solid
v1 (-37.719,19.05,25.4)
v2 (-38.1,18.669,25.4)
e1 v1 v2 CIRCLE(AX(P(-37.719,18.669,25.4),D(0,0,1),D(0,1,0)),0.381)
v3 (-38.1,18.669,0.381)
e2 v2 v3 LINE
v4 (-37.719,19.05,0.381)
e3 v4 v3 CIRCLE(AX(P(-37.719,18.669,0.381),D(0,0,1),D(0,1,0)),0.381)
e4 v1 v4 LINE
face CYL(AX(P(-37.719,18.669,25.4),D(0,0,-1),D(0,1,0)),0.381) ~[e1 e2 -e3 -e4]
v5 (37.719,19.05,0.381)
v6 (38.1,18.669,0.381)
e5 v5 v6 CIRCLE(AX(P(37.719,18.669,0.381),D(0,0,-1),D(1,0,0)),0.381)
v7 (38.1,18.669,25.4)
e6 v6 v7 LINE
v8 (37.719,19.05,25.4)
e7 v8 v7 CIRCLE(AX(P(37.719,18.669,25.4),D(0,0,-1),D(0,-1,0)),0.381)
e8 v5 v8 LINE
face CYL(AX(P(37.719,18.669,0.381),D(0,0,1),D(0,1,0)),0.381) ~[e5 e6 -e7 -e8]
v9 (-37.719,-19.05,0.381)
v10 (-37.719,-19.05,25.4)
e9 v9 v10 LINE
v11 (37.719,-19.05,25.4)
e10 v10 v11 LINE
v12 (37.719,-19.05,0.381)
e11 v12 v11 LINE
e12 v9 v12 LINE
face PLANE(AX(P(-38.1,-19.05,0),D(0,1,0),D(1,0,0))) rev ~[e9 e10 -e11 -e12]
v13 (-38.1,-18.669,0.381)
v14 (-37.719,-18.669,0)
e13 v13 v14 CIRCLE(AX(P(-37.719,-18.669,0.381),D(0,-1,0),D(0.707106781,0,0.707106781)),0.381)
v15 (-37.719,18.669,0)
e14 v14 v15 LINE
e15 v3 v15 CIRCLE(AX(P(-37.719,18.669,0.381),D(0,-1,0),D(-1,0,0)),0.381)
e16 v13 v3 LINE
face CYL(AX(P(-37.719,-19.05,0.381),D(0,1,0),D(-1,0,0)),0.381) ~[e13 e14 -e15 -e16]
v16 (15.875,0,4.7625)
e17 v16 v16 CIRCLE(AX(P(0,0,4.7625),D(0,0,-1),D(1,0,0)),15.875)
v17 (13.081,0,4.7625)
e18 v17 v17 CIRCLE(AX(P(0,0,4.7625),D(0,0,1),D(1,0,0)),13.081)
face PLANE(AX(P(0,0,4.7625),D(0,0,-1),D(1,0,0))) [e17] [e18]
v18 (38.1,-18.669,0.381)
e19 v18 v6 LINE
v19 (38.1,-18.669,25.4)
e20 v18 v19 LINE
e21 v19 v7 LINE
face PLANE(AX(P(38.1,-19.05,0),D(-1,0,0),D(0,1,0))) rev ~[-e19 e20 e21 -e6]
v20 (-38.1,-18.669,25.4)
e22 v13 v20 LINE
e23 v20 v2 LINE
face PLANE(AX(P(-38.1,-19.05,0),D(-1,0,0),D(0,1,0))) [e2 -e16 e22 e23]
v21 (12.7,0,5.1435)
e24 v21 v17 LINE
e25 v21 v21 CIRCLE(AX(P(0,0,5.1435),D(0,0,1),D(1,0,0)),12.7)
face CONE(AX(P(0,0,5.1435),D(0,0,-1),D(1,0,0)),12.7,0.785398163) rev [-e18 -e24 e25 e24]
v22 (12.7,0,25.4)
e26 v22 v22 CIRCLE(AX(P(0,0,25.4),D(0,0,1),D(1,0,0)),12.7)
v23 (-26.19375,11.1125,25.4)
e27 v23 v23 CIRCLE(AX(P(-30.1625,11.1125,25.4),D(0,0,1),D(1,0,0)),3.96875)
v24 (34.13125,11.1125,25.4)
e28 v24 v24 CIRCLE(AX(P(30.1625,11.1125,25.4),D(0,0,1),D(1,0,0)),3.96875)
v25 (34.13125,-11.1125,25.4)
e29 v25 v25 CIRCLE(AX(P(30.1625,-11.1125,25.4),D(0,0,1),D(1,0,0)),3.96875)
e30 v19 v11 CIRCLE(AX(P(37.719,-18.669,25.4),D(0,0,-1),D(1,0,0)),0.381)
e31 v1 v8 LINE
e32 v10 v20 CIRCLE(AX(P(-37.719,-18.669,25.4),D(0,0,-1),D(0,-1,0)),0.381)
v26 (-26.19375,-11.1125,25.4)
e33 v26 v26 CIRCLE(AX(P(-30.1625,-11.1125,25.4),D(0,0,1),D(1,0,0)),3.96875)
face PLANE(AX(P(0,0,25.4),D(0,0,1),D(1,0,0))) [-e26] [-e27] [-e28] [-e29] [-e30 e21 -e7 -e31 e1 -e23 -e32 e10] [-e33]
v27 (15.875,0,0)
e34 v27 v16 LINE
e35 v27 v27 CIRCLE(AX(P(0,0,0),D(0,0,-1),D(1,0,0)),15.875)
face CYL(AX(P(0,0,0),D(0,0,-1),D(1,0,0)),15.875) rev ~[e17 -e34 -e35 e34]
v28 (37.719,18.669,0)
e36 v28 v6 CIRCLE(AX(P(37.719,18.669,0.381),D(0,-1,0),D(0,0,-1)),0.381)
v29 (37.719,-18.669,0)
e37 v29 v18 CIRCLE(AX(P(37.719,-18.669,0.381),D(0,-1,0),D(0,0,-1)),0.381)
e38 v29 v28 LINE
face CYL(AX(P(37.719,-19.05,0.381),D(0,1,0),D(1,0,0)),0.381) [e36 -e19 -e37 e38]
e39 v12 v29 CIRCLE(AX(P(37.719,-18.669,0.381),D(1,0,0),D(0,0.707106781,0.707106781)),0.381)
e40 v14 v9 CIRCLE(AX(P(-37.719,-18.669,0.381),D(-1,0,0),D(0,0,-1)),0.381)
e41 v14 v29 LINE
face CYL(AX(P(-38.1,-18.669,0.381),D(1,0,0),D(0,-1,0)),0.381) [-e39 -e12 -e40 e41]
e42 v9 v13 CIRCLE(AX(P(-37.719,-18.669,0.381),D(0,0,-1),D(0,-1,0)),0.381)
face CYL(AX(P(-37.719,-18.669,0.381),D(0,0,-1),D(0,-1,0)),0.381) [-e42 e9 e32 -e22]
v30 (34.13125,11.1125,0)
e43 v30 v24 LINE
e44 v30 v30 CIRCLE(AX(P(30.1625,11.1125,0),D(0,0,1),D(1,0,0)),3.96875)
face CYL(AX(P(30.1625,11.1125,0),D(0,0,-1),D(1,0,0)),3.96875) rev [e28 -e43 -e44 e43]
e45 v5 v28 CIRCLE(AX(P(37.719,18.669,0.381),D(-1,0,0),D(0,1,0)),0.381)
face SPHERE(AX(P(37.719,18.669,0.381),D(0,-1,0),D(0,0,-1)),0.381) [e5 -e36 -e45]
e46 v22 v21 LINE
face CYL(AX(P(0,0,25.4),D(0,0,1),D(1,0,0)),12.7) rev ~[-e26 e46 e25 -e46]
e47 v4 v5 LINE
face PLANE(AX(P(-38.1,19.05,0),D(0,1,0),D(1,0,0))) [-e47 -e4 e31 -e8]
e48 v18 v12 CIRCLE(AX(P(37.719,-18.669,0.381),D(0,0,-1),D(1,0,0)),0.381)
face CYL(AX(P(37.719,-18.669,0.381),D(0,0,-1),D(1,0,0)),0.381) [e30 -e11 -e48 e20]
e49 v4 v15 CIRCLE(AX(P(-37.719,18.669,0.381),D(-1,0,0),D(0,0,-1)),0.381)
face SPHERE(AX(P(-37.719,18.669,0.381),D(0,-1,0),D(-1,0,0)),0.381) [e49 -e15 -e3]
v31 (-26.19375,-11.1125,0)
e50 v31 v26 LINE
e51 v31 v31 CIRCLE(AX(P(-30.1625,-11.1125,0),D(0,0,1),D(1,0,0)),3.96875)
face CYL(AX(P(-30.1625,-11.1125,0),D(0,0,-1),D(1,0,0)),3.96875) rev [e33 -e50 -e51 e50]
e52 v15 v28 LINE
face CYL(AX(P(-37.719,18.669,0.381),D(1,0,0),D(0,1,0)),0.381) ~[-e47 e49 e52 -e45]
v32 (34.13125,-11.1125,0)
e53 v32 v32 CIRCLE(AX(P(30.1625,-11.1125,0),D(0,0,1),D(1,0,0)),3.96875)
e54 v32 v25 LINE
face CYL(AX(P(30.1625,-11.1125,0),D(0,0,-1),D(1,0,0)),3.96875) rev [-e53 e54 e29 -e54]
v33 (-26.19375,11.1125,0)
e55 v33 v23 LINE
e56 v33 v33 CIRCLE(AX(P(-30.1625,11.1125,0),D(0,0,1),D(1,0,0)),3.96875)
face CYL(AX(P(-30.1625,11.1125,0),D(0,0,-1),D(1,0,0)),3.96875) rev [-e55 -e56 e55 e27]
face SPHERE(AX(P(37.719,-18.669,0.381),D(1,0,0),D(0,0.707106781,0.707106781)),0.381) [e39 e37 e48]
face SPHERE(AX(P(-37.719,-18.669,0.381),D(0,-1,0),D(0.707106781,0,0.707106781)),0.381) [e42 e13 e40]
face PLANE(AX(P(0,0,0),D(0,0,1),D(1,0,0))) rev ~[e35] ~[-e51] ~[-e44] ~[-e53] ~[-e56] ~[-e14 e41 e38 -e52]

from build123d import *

# Parameters (mm, degrees)
F0_W         = 76.2
F0_H         = 38.1
F0_R         = 3.96875
F1_DEPTH     = 25.4
F2_R         = 0.381
F3_R         = 0.381
F4_T1_DEPTH  = 25.9715
F4_S5_W      = 0.381
F4_S5_H      = 0.381
F4_T6_DEPTH  = 0.381
F4_S11_W     = 0.381
F4_S11_H     = 0.381
F4_T12_DEPTH = 0.381
F5_R         = 12.7
F6_DEPTH     = 25.4
F7_R         = 15.875
F8_DEPTH     = 4.7625
F9_SIZE      = 0.381


# Not quite as in the source:
# - a fillet or chamfer that OpenCascade refuses, or shapes differently, is made with other operations: its cross-section is extruded or revolved along the edge and cut away or added


with BuildPart() as f1:
    # F0 (on Top) → F1 (new body)
    with BuildSketch(Plane.XY):
        Rectangle(F0_W, F0_H)
        with Locations((-30.1625, -11.1125)):
            Circle(F0_R, mode=Mode.SUBTRACT)
        with Locations((30.1625, -11.1125)):
            Circle(F0_R, mode=Mode.SUBTRACT)
        with Locations((-30.1625, 11.1125)):
            Circle(F0_R, mode=Mode.SUBTRACT)
        with Locations((30.1625, 11.1125)):
            Circle(F0_R, mode=Mode.SUBTRACT)
    extrude(amount=F1_DEPTH)

    # F2
    f2_edges = [f1.edges().sort_by_distance(p)[0] for p in [
        (0, -19.05, 0),
        (38.1, 0, 0),
        (-38.1, 0, 0),
    ]]
    fillet(f2_edges, radius=F2_R)

    # F3
    f3_edges = [f1.edges().sort_by_distance(p)[0] for p in [
        (0, 19.05, 0),
    ]]
    fillet(f3_edges, radius=F3_R)

    # F4: fillet of radius 0.381 on 3 edges, made by hand

    # F4_s2 → F4_t1 (cut)
    with BuildSketch(Plane.XY.offset(0.381)):
        with BuildLine():
            ThreePointArc((38.1, -18.669), (37.9884076836, -18.9384076836), (37.719, -19.05))
            Line((37.719, -19.05), (38.1, -19.05))
            Line((38.1, -19.05), (38.1, -18.669))
        make_face()
        with BuildLine():
            ThreePointArc((-37.719, -19.05), (-37.9884076836, -18.9384076836), (-38.1, -18.669))
            Line((-38.1, -18.669), (-38.1, -19.05))
            Line((-38.1, -19.05), (-37.719, -19.05))
        make_face()
    extrude(amount=F4_T1_DEPTH, mode=Mode.SUBTRACT)


with BuildPart() as f4_tool4:
    # F4_s5 → F4_t6 (new body)
    with BuildSketch(Plane.XZ.offset(18.669)):
        with Locations((-37.9095, 0.1905)):
            Rectangle(F4_S5_W, F4_S5_H)
    extrude(amount=F4_T6_DEPTH)

    # F4_s7 → F4_t8 (revolve, cut)
    with BuildSketch(Plane(origin=(-37.719, -18.669, 0.381), x_dir=(0.7071067812, 0, 0.7071067812), z_dir=(0.7071067812, 0, -0.7071067812))):
        with BuildLine():
            ThreePointArc((0, -0.381), (0.381, 0), (0, 0.381))
            Line((0, 0.381), (0, -0.381))
        make_face()
    revolve(axis=Axis((-37.719, -18.669, 0.381), (0, -1, 0)), mode=Mode.SUBTRACT)


with BuildPart() as f1_1:
    add(f1.part)

    # F4_t3: cut F4_tool4
    add(f4_tool4.part, mode=Mode.SUBTRACT)


with BuildPart() as f4_tool10:
    # F4_s11 → F4_t12 (new body)
    with BuildSketch(Plane.YZ.offset(37.719)):
        with Locations((-18.8595, 0.1905)):
            Rectangle(F4_S11_W, F4_S11_H)
    extrude(amount=F4_T12_DEPTH)

    # F4_s13 → F4_t14 (revolve, cut)
    with BuildSketch(Plane(origin=(37.719, -18.669, 0.381), x_dir=(0, 0.7071067812, 0.7071067812), z_dir=(0, 0.7071067812, -0.7071067812))):
        with BuildLine():
            ThreePointArc((0, -0.381), (0.381, 0), (0, 0.381))
            Line((0, 0.381), (0, -0.381))
        make_face()
    revolve(axis=Axis((37.719, -18.669, 0.381), (1, 0, 0)), mode=Mode.SUBTRACT)


with BuildPart() as f1_2:
    add(f1_1.part)

    # F4_t9: cut F4_tool10
    add(f4_tool10.part, mode=Mode.SUBTRACT)

    # F5 (on face) → F6 (cut)
    with BuildSketch(Plane.XY.offset(25.4)):
        Circle(F5_R)
    extrude(amount=-F6_DEPTH, mode=Mode.SUBTRACT)

    # F7 (on face) → F8 (cut)
    with BuildSketch(Plane(origin=(0, 0, 0), x_dir=(1, 0, 0), z_dir=(0, 0, -1))):
        Circle(F7_R)
    extrude(amount=-F8_DEPTH, mode=Mode.SUBTRACT)

    # F9
    f9_edges = [f1_2.edges().sort_by_distance(p)[0] for p in [
        (-12.7, 0, 4.7625),
    ]]
    chamfer(f9_edges, length=F9_SIZE)


solid = f1_2.part
